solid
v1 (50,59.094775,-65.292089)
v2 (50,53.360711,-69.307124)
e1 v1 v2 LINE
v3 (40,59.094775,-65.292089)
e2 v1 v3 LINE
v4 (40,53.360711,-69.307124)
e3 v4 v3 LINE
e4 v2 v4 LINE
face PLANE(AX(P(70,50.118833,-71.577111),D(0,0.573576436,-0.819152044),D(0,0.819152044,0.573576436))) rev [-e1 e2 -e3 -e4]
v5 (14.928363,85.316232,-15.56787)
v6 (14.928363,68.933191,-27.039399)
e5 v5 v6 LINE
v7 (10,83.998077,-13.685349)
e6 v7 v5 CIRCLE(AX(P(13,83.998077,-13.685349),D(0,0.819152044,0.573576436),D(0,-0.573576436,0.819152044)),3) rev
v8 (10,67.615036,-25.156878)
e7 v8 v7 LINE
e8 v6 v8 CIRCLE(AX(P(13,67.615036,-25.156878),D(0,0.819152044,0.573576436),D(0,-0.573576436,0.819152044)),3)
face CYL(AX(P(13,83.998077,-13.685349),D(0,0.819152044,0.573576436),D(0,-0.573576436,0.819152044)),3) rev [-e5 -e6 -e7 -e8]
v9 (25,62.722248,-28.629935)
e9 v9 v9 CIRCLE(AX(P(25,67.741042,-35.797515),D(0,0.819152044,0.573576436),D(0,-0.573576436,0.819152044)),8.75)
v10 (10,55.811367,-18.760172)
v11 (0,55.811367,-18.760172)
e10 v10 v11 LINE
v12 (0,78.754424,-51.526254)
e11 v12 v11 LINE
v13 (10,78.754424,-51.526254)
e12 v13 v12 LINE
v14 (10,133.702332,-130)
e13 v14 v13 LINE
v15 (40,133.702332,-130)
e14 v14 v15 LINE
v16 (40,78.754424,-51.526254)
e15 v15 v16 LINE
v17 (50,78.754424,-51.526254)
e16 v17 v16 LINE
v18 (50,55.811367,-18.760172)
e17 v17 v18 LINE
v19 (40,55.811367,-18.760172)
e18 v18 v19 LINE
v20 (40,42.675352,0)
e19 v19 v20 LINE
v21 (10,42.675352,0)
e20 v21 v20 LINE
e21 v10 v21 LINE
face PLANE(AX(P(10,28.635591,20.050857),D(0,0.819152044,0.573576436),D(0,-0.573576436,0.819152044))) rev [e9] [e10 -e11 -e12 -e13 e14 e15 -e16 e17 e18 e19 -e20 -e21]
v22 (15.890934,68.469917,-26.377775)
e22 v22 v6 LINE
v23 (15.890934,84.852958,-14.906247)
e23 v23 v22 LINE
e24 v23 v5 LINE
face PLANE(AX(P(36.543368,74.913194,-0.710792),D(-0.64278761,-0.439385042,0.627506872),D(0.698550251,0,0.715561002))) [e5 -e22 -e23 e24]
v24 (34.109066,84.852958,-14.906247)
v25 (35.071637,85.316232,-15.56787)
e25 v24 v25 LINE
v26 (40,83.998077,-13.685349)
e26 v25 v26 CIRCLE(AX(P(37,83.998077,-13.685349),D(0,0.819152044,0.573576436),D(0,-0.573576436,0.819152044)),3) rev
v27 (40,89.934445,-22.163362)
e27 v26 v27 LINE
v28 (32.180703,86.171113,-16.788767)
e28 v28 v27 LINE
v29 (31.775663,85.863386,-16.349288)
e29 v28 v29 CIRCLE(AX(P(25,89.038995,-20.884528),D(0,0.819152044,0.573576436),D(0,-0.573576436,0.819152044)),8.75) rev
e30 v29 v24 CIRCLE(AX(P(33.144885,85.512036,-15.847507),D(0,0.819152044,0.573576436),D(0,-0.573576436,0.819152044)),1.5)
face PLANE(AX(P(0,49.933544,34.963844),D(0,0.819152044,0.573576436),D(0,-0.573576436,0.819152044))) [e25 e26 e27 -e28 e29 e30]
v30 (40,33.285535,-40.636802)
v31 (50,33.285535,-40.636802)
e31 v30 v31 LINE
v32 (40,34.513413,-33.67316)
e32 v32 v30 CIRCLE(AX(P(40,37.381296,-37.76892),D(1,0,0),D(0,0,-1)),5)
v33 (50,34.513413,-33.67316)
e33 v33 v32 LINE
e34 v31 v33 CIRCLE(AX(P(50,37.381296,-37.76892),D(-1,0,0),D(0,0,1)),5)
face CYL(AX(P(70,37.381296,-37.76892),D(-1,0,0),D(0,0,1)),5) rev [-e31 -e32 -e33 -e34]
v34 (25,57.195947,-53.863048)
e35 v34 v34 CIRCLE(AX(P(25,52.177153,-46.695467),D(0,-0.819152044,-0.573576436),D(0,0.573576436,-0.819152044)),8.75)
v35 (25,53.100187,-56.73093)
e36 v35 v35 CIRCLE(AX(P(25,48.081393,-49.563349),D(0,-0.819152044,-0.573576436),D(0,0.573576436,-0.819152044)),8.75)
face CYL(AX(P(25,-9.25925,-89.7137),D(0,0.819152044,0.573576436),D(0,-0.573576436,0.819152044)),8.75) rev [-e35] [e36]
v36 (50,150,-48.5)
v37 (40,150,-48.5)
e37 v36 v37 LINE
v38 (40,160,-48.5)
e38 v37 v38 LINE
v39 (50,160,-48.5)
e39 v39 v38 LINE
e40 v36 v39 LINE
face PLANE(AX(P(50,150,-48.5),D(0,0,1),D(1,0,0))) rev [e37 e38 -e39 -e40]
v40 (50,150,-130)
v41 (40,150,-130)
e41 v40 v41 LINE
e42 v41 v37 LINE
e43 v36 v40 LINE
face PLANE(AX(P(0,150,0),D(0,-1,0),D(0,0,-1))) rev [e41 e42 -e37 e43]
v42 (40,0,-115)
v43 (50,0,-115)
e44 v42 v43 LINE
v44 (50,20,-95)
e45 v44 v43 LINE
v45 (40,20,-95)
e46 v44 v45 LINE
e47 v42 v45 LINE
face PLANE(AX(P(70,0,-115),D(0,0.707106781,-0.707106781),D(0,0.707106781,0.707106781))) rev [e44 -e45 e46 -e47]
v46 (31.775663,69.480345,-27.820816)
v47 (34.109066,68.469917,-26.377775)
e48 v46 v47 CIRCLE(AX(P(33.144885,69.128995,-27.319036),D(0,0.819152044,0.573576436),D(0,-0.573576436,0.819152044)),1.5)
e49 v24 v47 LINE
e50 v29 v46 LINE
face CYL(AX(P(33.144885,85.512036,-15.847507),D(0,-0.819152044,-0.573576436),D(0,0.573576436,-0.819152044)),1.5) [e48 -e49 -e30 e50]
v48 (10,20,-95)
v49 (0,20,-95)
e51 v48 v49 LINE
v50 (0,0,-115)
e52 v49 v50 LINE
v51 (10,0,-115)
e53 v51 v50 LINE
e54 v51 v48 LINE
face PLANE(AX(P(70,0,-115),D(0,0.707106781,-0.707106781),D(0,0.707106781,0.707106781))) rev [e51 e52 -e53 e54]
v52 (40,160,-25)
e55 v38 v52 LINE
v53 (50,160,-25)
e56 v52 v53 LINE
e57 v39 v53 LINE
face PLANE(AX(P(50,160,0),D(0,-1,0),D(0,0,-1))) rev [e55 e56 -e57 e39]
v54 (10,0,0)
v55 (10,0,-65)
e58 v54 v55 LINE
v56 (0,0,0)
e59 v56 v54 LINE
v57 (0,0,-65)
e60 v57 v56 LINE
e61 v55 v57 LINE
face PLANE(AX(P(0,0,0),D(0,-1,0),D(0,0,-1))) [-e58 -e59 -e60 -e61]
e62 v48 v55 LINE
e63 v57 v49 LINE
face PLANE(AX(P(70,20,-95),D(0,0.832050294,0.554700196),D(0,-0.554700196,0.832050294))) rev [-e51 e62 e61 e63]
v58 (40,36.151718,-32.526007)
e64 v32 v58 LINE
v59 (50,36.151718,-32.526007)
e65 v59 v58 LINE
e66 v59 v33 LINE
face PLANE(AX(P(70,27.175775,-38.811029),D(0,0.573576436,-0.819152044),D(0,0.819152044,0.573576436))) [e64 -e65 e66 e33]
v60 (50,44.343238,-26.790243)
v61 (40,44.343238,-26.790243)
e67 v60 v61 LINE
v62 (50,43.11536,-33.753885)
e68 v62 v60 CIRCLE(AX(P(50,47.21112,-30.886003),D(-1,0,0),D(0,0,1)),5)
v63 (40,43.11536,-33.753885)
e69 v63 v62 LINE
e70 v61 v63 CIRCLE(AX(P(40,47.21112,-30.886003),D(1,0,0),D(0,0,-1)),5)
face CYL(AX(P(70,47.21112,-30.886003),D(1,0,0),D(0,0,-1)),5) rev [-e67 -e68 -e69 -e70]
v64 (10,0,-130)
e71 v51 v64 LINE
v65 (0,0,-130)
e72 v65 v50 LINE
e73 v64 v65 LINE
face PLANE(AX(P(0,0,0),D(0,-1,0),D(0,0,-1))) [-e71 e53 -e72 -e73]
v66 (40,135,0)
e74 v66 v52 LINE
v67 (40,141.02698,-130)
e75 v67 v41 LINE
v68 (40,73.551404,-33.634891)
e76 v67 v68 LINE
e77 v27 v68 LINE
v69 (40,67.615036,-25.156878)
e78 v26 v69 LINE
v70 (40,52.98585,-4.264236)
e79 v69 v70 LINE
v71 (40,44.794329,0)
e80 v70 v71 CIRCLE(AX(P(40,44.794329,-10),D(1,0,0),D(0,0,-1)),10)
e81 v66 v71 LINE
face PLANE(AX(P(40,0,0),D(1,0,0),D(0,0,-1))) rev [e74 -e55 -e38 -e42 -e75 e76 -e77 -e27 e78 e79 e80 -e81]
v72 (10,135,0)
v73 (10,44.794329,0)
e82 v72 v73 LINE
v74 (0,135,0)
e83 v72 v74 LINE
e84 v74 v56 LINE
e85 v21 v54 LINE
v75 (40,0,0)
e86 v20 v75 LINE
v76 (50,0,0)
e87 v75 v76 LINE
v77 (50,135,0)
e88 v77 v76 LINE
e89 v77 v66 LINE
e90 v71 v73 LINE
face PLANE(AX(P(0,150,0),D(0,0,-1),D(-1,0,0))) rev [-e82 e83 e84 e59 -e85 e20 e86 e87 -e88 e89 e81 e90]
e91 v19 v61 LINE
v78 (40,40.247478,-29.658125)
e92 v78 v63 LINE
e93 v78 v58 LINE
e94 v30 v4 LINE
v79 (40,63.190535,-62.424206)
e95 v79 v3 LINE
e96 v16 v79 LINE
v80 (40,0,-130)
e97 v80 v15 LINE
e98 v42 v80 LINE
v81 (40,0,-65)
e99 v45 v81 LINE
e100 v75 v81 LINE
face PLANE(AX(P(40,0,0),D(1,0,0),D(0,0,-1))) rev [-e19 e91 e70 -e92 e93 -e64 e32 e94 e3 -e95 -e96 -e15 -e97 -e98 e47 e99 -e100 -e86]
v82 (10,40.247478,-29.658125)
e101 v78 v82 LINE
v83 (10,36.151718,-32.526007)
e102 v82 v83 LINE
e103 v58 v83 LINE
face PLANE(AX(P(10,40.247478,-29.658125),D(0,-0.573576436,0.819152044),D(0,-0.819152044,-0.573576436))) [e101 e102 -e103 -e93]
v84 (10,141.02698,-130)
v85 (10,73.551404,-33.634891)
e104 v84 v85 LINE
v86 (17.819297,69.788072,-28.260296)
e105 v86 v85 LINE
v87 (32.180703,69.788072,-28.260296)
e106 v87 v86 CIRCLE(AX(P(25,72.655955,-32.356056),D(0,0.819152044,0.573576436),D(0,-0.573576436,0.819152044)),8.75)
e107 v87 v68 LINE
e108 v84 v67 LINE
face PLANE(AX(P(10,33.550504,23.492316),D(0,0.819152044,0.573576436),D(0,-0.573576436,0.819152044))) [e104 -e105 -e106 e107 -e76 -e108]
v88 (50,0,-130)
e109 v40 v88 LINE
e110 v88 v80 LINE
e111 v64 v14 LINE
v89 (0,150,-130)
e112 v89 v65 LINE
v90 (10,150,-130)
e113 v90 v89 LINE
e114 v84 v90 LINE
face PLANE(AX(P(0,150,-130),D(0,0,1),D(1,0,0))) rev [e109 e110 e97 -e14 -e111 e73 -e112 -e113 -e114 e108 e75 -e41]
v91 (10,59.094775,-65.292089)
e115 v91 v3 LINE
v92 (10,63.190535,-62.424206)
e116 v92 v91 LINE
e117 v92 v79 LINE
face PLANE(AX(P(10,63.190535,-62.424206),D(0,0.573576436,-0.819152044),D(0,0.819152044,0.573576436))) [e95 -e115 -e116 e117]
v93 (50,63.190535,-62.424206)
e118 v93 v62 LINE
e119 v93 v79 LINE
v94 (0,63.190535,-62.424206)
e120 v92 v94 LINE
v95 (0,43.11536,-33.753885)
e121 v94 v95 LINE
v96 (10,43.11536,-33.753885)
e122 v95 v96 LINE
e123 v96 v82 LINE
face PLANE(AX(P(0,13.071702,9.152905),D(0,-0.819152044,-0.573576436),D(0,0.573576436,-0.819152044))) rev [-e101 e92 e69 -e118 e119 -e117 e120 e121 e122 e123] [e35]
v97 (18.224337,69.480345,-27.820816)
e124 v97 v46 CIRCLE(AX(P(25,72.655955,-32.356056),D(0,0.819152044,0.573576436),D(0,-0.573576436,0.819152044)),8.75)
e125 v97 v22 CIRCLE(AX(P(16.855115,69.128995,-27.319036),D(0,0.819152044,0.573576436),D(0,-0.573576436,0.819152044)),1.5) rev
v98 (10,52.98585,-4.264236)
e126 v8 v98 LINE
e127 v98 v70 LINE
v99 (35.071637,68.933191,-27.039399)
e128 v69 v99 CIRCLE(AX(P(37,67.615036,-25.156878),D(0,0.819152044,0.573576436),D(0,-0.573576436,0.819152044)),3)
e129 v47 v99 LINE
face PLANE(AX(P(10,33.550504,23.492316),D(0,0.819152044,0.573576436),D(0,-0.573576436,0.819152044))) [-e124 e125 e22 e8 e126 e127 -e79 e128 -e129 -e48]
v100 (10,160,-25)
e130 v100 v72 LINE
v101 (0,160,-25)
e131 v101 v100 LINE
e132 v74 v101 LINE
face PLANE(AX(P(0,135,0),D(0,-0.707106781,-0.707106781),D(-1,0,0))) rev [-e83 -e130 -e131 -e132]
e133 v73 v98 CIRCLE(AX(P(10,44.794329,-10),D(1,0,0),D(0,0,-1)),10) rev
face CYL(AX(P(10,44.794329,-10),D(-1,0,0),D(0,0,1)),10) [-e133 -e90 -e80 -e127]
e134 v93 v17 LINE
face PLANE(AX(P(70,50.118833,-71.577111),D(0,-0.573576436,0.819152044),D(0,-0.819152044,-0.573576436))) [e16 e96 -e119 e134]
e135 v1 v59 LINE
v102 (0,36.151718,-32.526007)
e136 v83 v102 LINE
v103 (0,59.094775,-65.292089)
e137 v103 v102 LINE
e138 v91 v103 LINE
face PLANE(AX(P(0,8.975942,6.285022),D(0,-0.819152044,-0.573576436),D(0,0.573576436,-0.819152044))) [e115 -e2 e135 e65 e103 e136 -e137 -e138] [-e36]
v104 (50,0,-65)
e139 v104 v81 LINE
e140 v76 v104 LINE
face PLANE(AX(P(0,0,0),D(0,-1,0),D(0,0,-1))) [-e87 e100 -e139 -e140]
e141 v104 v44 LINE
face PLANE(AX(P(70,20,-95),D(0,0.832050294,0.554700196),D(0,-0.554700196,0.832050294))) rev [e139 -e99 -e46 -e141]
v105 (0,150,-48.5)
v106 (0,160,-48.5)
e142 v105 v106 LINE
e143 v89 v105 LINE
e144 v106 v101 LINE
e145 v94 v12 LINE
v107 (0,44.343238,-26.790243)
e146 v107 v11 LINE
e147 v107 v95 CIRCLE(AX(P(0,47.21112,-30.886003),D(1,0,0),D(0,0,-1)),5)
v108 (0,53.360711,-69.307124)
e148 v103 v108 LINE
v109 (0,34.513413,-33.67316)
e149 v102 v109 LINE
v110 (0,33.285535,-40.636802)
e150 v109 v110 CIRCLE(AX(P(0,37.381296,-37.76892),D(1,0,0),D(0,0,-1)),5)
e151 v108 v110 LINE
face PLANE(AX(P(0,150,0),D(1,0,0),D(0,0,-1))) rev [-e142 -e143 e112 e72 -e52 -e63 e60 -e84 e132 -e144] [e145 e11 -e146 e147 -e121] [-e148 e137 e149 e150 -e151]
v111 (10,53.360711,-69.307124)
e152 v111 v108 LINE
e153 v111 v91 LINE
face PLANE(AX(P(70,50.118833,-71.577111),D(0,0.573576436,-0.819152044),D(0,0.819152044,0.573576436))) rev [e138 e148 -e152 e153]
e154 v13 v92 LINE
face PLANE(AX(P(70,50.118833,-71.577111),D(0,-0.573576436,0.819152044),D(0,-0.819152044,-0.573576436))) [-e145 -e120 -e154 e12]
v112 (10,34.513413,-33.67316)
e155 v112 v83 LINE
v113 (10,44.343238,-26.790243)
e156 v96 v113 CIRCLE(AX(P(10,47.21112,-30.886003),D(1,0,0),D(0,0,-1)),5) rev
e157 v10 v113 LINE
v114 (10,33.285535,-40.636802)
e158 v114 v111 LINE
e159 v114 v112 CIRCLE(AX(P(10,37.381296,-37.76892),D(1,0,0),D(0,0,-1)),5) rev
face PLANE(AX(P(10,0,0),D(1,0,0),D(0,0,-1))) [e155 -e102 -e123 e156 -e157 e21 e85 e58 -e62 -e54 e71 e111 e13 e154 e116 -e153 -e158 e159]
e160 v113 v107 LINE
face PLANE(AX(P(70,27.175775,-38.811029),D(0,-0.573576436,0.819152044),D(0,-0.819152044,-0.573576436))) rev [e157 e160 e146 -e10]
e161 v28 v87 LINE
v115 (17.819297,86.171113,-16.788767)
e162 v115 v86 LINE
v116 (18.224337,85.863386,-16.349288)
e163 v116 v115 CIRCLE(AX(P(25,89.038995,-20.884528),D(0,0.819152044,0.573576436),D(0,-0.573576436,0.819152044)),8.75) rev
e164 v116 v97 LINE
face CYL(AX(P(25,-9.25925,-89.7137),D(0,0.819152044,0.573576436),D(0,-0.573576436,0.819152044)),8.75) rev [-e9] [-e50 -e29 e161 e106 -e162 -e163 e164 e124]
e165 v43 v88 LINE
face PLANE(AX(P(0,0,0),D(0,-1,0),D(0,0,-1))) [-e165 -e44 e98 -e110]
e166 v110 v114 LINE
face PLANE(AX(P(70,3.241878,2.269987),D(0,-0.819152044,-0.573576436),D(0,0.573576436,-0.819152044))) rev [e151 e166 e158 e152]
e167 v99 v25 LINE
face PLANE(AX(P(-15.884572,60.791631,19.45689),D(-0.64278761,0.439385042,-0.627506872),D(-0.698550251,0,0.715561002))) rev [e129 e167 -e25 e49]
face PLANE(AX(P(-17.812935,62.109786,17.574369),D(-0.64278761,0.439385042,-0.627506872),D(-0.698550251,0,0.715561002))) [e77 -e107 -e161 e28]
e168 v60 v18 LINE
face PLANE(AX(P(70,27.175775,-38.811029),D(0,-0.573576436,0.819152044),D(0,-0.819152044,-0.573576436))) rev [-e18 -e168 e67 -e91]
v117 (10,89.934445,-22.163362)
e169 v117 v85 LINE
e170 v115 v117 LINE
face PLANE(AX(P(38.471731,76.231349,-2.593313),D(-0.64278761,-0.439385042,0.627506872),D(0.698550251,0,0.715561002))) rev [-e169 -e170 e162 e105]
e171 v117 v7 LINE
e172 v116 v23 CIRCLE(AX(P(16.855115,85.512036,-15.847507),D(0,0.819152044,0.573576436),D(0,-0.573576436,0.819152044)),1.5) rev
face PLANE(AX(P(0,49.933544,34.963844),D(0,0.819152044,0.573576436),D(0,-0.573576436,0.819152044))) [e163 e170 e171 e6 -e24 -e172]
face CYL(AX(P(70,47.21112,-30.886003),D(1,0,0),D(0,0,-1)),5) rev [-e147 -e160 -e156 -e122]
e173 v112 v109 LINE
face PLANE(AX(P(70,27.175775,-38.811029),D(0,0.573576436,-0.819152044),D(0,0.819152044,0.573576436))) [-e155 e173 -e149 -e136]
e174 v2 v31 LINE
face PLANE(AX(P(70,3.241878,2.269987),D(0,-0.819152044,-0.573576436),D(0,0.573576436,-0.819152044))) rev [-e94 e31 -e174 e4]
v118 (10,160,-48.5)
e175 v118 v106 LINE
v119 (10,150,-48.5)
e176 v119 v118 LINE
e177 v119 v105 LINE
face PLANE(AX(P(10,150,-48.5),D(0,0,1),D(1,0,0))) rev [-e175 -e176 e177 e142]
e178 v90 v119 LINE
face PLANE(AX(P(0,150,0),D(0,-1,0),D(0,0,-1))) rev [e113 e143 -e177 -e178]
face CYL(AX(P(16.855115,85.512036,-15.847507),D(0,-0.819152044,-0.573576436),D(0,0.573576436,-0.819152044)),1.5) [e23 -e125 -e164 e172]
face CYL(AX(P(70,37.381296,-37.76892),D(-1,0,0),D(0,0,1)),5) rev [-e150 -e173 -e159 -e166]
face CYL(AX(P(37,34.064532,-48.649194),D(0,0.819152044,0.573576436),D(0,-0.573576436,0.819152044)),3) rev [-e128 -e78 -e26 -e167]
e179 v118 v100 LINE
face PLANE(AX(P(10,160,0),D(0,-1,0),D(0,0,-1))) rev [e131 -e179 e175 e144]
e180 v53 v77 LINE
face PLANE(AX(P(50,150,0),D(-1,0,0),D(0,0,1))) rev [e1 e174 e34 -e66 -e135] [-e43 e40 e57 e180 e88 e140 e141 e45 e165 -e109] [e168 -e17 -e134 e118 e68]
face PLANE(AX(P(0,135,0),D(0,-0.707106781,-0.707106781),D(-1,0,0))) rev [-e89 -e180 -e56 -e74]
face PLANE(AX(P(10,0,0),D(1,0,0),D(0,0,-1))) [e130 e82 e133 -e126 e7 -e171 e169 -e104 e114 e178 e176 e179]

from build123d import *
from build123d.topology import SkipClean

# Parameters (mm, degrees)
SKETCH5_W           = 50
SKETCH5_H           = 130
BOSS_EXTRUDE1_DEPTH = 150
CUT_EXTRUDE1_START  = -25
CUT_EXTRUDE1_DEPTH  = 15
BOSS_EXTRUDE3_START = 30
SKETCH17_W          = 30
SKETCH17_H          = 40
BOSS_EXTRUDE3_DEPTH = 5
SKETCH10_R          = 8.75
CUT_EXTRUDE3_DEPTH  = 100
SKETCH18_W          = 48.5
SKETCH18_H          = 10
BOSS_EXTRUDE4_DEPTH = 10
BOSS_EXTRUDE5_START = 40
SKETCH18_2_W        = 48.5
SKETCH18_2_H        = 10
BOSS_EXTRUDE5_DEPTH = 10
CHAMFER1_SIZE       = 25
CUT_EXTRUDE5_DEPTH  = 70
FILLET1_DEPTH       = 10
FILLET1_START       = 40
FILLET1_2_DEPTH     = 10
CUT_EXTRUDE6_DEPTH  = 70
FILLET2_R           = 10
BOSS_EXTRUDE6_START = 20
BOSS_EXTRUDE6_DEPTH = 20
FILLET4_R           = 3


with BuildPart() as part:
    # Sketch5 → Boss-Extrude1 (new body)
    with BuildSketch(Plane(origin=(0, 0, 0), x_dir=(1, 0, 0), z_dir=(0, 1, 0))):
        with Locations((25, 65)):
            Rectangle(SKETCH5_W, SKETCH5_H)
    extrude(amount=BOSS_EXTRUDE1_DEPTH)

    # Sketch7 → Cut-Extrude1 (cut, symmetric)
    with BuildSketch(Plane(origin=(50, 0, 0), x_dir=(0, 0, -1), z_dir=(1, 0, 0)).offset(CUT_EXTRUDE1_START)):
        Polygon((130, 0), (130, 133.702332435), (0, 42.675352467), (0, 0), align=None)
        Polygon((0, 50), (130, 141.026979967), (130, 150), (0, 150), align=None)
    extrude(amount=CUT_EXTRUDE1_DEPTH, both=True, mode=Mode.SUBTRACT)

    # Sketch17 → Boss-Extrude3 (add)
    with BuildSketch(Plane(origin=(0, 275.412054826, -321.921776796), x_dir=(1, 0, 0), z_dir=(0, -0.819152044288993, -0.5735764363510444)).offset(BOSS_EXTRUDE3_START)):
        with Locations((25, 354.293228142)):
            Rectangle(SKETCH17_W, SKETCH17_H)
    extrude(amount=-BOSS_EXTRUDE3_DEPTH)

    # Sketch10 → Cut-Extrude3 (cut)
    with BuildSketch(Plane(origin=(0, 33.550503583, 23.49231552), x_dir=(1, 0, 0), z_dir=(0, 0.819152044288993, 0.5735764363510444))):
        with Locations(Location((25, 68.178273127, 0), (0, 0, 90))):
            Circle(SKETCH10_R)
    extrude(amount=-CUT_EXTRUDE3_DEPTH, mode=Mode.SUBTRACT)

    # Sketch18 → Boss-Extrude4 (add)
    with BuildSketch(Plane(origin=(0, 0, 0), x_dir=(0, 0, -1), z_dir=(1, 0, 0))):
        with Locations((24.25, 155)):
            Rectangle(SKETCH18_W, SKETCH18_H)
    extrude(amount=BOSS_EXTRUDE4_DEPTH)

    # Sketch18<2> → Boss-Extrude5 (add)
    with BuildSketch(Plane(origin=(0, 0, 0), x_dir=(0, 0, -1), z_dir=(1, 0, 0)).offset(BOSS_EXTRUDE5_START)):
        with Locations((24.25, 155)):
            Rectangle(SKETCH18_2_W, SKETCH18_2_H)
    extrude(amount=BOSS_EXTRUDE5_DEPTH)

    # Chamfer1
    chamfer1_edges = [part.edges().sort_by_distance(p)[0] for p in [
        (5, 160, 0),
        (45, 160, 0),
    ]]
    chamfer(chamfer1_edges, length=CHAMFER1_SIZE)

    # Sketch21 → Cut-Extrude5 (cut)
    with BuildSketch(Plane(origin=(0, 0, 0), x_dir=(0, 0, -1), z_dir=(1, 0, 0))):
        Polygon((62.42420648, 63.190535225), (51.526254189, 78.754424066), (18.760172418, 55.811366612), (29.658124708, 40.247477771), align=None)
        Polygon((69.307123716, 53.360710693), (36.541041945, 30.417653239), (32.52600689, 36.151717549), (65.292088662, 59.094775003), align=None)
    extrude(amount=CUT_EXTRUDE5_DEPTH, mode=Mode.SUBTRACT)

    # Fillet1: read off the stored shape, not the designer's step
    # Fillet1 outline → Fillet1 (add)
    with BuildSketch(Plane.YZ):
        with BuildLine():
            Line((30.417653239, -36.541041945), (33.285535421, -40.636802166))
            ThreePointArc((33.285535421, -40.636802166), (32.457256878, -36.900679096), (34.513413461, -33.673159763))
            Line((34.513413461, -33.673159763), (30.417653239, -36.541041945))
        make_face()
        with BuildLine():
            ThreePointArc((43.115359953, -33.75388493), (42.287081409, -30.01776186), (44.343237992, -26.790242527))
            Line((44.343237992, -26.790242527), (40.247477771, -29.658124708))
            Line((40.247477771, -29.658124708), (43.115359953, -33.75388493))
        make_face()
    extrude(amount=FILLET1_DEPTH)

    # Fillet1 2 outline → Fillet1 2 (add)
    with BuildSketch(Plane.YZ.offset(FILLET1_START)):
        with BuildLine():
            Line((30.417653239, -36.541041945), (33.285535421, -40.636802166))
            ThreePointArc((33.285535421, -40.636802166), (32.457256878, -36.900679096), (34.513413461, -33.673159763))
            Line((34.513413461, -33.673159763), (30.417653239, -36.541041945))
        make_face()
        with BuildLine():
            ThreePointArc((43.115359953, -33.75388493), (42.287081409, -30.01776186), (44.343237992, -26.790242527))
            Line((44.343237992, -26.790242527), (40.247477771, -29.658124708))
            Line((40.247477771, -29.658124708), (43.115359953, -33.75388493))
        make_face()
    extrude(amount=FILLET1_2_DEPTH)

    # Sketch22 → Cut-Extrude6 (cut)
    with BuildSketch(Plane.ZY):
        Polygon((-115, 0), (-95, 20), (-65, 0), align=None)
    extrude(amount=-CUT_EXTRUDE6_DEPTH, mode=Mode.SUBTRACT)

    # Fillet2
    fillet2_edges = [part.edges().sort_by_distance(p)[0] for p in [
        (25, 50, 0),
    ]]
    fillet(fillet2_edges, radius=FILLET2_R)

    # Sketch23 → Boss-Extrude6 (add)
    with SkipClean():  # the faces are left unmerged after this step: merging them gives an invalid solid
        with BuildSketch(Plane(origin=(0, 33.550503583, 23.49231552), x_dir=(1, 0, 0), z_dir=(0, 0.819152044288993, 0.5735764363510445)).offset(BOSS_EXTRUDE6_START)):
            with BuildLine():
                Line((40, 69.739442097), (32.180703308, 63.178273127))
                ThreePointArc((32.180703308, 63.178273127), (31.983337112, 62.906129088), (31.77566264, 62.64176739))
                ThreePointArc((31.77566264, 62.64176739), (32.241088602, 60.832062958), (34.109066137, 60.880139798))
                Line((34.109066137, 60.880139798), (40, 65.823220229))
                Line((40, 65.823220229), (40, 69.739442097))
            make_face()
            with BuildLine():
                ThreePointArc((18.22433736, 62.64176739), (18.016662888, 62.906129088), (17.819296692, 63.178273127))
                Line((17.819296692, 63.178273127), (10, 69.739442097))
                Line((10, 69.739442097), (10, 65.823220229))
                Line((10, 65.823220229), (15.890933863, 60.880139798))
                ThreePointArc((15.890933863, 60.880139798), (17.758911398, 60.832062958), (18.22433736, 62.64176739))
            make_face()
        extrude(amount=-BOSS_EXTRUDE6_DEPTH)

    # Fillet4
    fillet4_edges = [part.edges().sort_by_distance(p)[0] for p in [
        (40, 79.496672114, -24.691145529),
        (10, 79.496672114, -24.691145529),
    ]]
    fillet(fillet4_edges, radius=FILLET4_R)


solid = part.part
